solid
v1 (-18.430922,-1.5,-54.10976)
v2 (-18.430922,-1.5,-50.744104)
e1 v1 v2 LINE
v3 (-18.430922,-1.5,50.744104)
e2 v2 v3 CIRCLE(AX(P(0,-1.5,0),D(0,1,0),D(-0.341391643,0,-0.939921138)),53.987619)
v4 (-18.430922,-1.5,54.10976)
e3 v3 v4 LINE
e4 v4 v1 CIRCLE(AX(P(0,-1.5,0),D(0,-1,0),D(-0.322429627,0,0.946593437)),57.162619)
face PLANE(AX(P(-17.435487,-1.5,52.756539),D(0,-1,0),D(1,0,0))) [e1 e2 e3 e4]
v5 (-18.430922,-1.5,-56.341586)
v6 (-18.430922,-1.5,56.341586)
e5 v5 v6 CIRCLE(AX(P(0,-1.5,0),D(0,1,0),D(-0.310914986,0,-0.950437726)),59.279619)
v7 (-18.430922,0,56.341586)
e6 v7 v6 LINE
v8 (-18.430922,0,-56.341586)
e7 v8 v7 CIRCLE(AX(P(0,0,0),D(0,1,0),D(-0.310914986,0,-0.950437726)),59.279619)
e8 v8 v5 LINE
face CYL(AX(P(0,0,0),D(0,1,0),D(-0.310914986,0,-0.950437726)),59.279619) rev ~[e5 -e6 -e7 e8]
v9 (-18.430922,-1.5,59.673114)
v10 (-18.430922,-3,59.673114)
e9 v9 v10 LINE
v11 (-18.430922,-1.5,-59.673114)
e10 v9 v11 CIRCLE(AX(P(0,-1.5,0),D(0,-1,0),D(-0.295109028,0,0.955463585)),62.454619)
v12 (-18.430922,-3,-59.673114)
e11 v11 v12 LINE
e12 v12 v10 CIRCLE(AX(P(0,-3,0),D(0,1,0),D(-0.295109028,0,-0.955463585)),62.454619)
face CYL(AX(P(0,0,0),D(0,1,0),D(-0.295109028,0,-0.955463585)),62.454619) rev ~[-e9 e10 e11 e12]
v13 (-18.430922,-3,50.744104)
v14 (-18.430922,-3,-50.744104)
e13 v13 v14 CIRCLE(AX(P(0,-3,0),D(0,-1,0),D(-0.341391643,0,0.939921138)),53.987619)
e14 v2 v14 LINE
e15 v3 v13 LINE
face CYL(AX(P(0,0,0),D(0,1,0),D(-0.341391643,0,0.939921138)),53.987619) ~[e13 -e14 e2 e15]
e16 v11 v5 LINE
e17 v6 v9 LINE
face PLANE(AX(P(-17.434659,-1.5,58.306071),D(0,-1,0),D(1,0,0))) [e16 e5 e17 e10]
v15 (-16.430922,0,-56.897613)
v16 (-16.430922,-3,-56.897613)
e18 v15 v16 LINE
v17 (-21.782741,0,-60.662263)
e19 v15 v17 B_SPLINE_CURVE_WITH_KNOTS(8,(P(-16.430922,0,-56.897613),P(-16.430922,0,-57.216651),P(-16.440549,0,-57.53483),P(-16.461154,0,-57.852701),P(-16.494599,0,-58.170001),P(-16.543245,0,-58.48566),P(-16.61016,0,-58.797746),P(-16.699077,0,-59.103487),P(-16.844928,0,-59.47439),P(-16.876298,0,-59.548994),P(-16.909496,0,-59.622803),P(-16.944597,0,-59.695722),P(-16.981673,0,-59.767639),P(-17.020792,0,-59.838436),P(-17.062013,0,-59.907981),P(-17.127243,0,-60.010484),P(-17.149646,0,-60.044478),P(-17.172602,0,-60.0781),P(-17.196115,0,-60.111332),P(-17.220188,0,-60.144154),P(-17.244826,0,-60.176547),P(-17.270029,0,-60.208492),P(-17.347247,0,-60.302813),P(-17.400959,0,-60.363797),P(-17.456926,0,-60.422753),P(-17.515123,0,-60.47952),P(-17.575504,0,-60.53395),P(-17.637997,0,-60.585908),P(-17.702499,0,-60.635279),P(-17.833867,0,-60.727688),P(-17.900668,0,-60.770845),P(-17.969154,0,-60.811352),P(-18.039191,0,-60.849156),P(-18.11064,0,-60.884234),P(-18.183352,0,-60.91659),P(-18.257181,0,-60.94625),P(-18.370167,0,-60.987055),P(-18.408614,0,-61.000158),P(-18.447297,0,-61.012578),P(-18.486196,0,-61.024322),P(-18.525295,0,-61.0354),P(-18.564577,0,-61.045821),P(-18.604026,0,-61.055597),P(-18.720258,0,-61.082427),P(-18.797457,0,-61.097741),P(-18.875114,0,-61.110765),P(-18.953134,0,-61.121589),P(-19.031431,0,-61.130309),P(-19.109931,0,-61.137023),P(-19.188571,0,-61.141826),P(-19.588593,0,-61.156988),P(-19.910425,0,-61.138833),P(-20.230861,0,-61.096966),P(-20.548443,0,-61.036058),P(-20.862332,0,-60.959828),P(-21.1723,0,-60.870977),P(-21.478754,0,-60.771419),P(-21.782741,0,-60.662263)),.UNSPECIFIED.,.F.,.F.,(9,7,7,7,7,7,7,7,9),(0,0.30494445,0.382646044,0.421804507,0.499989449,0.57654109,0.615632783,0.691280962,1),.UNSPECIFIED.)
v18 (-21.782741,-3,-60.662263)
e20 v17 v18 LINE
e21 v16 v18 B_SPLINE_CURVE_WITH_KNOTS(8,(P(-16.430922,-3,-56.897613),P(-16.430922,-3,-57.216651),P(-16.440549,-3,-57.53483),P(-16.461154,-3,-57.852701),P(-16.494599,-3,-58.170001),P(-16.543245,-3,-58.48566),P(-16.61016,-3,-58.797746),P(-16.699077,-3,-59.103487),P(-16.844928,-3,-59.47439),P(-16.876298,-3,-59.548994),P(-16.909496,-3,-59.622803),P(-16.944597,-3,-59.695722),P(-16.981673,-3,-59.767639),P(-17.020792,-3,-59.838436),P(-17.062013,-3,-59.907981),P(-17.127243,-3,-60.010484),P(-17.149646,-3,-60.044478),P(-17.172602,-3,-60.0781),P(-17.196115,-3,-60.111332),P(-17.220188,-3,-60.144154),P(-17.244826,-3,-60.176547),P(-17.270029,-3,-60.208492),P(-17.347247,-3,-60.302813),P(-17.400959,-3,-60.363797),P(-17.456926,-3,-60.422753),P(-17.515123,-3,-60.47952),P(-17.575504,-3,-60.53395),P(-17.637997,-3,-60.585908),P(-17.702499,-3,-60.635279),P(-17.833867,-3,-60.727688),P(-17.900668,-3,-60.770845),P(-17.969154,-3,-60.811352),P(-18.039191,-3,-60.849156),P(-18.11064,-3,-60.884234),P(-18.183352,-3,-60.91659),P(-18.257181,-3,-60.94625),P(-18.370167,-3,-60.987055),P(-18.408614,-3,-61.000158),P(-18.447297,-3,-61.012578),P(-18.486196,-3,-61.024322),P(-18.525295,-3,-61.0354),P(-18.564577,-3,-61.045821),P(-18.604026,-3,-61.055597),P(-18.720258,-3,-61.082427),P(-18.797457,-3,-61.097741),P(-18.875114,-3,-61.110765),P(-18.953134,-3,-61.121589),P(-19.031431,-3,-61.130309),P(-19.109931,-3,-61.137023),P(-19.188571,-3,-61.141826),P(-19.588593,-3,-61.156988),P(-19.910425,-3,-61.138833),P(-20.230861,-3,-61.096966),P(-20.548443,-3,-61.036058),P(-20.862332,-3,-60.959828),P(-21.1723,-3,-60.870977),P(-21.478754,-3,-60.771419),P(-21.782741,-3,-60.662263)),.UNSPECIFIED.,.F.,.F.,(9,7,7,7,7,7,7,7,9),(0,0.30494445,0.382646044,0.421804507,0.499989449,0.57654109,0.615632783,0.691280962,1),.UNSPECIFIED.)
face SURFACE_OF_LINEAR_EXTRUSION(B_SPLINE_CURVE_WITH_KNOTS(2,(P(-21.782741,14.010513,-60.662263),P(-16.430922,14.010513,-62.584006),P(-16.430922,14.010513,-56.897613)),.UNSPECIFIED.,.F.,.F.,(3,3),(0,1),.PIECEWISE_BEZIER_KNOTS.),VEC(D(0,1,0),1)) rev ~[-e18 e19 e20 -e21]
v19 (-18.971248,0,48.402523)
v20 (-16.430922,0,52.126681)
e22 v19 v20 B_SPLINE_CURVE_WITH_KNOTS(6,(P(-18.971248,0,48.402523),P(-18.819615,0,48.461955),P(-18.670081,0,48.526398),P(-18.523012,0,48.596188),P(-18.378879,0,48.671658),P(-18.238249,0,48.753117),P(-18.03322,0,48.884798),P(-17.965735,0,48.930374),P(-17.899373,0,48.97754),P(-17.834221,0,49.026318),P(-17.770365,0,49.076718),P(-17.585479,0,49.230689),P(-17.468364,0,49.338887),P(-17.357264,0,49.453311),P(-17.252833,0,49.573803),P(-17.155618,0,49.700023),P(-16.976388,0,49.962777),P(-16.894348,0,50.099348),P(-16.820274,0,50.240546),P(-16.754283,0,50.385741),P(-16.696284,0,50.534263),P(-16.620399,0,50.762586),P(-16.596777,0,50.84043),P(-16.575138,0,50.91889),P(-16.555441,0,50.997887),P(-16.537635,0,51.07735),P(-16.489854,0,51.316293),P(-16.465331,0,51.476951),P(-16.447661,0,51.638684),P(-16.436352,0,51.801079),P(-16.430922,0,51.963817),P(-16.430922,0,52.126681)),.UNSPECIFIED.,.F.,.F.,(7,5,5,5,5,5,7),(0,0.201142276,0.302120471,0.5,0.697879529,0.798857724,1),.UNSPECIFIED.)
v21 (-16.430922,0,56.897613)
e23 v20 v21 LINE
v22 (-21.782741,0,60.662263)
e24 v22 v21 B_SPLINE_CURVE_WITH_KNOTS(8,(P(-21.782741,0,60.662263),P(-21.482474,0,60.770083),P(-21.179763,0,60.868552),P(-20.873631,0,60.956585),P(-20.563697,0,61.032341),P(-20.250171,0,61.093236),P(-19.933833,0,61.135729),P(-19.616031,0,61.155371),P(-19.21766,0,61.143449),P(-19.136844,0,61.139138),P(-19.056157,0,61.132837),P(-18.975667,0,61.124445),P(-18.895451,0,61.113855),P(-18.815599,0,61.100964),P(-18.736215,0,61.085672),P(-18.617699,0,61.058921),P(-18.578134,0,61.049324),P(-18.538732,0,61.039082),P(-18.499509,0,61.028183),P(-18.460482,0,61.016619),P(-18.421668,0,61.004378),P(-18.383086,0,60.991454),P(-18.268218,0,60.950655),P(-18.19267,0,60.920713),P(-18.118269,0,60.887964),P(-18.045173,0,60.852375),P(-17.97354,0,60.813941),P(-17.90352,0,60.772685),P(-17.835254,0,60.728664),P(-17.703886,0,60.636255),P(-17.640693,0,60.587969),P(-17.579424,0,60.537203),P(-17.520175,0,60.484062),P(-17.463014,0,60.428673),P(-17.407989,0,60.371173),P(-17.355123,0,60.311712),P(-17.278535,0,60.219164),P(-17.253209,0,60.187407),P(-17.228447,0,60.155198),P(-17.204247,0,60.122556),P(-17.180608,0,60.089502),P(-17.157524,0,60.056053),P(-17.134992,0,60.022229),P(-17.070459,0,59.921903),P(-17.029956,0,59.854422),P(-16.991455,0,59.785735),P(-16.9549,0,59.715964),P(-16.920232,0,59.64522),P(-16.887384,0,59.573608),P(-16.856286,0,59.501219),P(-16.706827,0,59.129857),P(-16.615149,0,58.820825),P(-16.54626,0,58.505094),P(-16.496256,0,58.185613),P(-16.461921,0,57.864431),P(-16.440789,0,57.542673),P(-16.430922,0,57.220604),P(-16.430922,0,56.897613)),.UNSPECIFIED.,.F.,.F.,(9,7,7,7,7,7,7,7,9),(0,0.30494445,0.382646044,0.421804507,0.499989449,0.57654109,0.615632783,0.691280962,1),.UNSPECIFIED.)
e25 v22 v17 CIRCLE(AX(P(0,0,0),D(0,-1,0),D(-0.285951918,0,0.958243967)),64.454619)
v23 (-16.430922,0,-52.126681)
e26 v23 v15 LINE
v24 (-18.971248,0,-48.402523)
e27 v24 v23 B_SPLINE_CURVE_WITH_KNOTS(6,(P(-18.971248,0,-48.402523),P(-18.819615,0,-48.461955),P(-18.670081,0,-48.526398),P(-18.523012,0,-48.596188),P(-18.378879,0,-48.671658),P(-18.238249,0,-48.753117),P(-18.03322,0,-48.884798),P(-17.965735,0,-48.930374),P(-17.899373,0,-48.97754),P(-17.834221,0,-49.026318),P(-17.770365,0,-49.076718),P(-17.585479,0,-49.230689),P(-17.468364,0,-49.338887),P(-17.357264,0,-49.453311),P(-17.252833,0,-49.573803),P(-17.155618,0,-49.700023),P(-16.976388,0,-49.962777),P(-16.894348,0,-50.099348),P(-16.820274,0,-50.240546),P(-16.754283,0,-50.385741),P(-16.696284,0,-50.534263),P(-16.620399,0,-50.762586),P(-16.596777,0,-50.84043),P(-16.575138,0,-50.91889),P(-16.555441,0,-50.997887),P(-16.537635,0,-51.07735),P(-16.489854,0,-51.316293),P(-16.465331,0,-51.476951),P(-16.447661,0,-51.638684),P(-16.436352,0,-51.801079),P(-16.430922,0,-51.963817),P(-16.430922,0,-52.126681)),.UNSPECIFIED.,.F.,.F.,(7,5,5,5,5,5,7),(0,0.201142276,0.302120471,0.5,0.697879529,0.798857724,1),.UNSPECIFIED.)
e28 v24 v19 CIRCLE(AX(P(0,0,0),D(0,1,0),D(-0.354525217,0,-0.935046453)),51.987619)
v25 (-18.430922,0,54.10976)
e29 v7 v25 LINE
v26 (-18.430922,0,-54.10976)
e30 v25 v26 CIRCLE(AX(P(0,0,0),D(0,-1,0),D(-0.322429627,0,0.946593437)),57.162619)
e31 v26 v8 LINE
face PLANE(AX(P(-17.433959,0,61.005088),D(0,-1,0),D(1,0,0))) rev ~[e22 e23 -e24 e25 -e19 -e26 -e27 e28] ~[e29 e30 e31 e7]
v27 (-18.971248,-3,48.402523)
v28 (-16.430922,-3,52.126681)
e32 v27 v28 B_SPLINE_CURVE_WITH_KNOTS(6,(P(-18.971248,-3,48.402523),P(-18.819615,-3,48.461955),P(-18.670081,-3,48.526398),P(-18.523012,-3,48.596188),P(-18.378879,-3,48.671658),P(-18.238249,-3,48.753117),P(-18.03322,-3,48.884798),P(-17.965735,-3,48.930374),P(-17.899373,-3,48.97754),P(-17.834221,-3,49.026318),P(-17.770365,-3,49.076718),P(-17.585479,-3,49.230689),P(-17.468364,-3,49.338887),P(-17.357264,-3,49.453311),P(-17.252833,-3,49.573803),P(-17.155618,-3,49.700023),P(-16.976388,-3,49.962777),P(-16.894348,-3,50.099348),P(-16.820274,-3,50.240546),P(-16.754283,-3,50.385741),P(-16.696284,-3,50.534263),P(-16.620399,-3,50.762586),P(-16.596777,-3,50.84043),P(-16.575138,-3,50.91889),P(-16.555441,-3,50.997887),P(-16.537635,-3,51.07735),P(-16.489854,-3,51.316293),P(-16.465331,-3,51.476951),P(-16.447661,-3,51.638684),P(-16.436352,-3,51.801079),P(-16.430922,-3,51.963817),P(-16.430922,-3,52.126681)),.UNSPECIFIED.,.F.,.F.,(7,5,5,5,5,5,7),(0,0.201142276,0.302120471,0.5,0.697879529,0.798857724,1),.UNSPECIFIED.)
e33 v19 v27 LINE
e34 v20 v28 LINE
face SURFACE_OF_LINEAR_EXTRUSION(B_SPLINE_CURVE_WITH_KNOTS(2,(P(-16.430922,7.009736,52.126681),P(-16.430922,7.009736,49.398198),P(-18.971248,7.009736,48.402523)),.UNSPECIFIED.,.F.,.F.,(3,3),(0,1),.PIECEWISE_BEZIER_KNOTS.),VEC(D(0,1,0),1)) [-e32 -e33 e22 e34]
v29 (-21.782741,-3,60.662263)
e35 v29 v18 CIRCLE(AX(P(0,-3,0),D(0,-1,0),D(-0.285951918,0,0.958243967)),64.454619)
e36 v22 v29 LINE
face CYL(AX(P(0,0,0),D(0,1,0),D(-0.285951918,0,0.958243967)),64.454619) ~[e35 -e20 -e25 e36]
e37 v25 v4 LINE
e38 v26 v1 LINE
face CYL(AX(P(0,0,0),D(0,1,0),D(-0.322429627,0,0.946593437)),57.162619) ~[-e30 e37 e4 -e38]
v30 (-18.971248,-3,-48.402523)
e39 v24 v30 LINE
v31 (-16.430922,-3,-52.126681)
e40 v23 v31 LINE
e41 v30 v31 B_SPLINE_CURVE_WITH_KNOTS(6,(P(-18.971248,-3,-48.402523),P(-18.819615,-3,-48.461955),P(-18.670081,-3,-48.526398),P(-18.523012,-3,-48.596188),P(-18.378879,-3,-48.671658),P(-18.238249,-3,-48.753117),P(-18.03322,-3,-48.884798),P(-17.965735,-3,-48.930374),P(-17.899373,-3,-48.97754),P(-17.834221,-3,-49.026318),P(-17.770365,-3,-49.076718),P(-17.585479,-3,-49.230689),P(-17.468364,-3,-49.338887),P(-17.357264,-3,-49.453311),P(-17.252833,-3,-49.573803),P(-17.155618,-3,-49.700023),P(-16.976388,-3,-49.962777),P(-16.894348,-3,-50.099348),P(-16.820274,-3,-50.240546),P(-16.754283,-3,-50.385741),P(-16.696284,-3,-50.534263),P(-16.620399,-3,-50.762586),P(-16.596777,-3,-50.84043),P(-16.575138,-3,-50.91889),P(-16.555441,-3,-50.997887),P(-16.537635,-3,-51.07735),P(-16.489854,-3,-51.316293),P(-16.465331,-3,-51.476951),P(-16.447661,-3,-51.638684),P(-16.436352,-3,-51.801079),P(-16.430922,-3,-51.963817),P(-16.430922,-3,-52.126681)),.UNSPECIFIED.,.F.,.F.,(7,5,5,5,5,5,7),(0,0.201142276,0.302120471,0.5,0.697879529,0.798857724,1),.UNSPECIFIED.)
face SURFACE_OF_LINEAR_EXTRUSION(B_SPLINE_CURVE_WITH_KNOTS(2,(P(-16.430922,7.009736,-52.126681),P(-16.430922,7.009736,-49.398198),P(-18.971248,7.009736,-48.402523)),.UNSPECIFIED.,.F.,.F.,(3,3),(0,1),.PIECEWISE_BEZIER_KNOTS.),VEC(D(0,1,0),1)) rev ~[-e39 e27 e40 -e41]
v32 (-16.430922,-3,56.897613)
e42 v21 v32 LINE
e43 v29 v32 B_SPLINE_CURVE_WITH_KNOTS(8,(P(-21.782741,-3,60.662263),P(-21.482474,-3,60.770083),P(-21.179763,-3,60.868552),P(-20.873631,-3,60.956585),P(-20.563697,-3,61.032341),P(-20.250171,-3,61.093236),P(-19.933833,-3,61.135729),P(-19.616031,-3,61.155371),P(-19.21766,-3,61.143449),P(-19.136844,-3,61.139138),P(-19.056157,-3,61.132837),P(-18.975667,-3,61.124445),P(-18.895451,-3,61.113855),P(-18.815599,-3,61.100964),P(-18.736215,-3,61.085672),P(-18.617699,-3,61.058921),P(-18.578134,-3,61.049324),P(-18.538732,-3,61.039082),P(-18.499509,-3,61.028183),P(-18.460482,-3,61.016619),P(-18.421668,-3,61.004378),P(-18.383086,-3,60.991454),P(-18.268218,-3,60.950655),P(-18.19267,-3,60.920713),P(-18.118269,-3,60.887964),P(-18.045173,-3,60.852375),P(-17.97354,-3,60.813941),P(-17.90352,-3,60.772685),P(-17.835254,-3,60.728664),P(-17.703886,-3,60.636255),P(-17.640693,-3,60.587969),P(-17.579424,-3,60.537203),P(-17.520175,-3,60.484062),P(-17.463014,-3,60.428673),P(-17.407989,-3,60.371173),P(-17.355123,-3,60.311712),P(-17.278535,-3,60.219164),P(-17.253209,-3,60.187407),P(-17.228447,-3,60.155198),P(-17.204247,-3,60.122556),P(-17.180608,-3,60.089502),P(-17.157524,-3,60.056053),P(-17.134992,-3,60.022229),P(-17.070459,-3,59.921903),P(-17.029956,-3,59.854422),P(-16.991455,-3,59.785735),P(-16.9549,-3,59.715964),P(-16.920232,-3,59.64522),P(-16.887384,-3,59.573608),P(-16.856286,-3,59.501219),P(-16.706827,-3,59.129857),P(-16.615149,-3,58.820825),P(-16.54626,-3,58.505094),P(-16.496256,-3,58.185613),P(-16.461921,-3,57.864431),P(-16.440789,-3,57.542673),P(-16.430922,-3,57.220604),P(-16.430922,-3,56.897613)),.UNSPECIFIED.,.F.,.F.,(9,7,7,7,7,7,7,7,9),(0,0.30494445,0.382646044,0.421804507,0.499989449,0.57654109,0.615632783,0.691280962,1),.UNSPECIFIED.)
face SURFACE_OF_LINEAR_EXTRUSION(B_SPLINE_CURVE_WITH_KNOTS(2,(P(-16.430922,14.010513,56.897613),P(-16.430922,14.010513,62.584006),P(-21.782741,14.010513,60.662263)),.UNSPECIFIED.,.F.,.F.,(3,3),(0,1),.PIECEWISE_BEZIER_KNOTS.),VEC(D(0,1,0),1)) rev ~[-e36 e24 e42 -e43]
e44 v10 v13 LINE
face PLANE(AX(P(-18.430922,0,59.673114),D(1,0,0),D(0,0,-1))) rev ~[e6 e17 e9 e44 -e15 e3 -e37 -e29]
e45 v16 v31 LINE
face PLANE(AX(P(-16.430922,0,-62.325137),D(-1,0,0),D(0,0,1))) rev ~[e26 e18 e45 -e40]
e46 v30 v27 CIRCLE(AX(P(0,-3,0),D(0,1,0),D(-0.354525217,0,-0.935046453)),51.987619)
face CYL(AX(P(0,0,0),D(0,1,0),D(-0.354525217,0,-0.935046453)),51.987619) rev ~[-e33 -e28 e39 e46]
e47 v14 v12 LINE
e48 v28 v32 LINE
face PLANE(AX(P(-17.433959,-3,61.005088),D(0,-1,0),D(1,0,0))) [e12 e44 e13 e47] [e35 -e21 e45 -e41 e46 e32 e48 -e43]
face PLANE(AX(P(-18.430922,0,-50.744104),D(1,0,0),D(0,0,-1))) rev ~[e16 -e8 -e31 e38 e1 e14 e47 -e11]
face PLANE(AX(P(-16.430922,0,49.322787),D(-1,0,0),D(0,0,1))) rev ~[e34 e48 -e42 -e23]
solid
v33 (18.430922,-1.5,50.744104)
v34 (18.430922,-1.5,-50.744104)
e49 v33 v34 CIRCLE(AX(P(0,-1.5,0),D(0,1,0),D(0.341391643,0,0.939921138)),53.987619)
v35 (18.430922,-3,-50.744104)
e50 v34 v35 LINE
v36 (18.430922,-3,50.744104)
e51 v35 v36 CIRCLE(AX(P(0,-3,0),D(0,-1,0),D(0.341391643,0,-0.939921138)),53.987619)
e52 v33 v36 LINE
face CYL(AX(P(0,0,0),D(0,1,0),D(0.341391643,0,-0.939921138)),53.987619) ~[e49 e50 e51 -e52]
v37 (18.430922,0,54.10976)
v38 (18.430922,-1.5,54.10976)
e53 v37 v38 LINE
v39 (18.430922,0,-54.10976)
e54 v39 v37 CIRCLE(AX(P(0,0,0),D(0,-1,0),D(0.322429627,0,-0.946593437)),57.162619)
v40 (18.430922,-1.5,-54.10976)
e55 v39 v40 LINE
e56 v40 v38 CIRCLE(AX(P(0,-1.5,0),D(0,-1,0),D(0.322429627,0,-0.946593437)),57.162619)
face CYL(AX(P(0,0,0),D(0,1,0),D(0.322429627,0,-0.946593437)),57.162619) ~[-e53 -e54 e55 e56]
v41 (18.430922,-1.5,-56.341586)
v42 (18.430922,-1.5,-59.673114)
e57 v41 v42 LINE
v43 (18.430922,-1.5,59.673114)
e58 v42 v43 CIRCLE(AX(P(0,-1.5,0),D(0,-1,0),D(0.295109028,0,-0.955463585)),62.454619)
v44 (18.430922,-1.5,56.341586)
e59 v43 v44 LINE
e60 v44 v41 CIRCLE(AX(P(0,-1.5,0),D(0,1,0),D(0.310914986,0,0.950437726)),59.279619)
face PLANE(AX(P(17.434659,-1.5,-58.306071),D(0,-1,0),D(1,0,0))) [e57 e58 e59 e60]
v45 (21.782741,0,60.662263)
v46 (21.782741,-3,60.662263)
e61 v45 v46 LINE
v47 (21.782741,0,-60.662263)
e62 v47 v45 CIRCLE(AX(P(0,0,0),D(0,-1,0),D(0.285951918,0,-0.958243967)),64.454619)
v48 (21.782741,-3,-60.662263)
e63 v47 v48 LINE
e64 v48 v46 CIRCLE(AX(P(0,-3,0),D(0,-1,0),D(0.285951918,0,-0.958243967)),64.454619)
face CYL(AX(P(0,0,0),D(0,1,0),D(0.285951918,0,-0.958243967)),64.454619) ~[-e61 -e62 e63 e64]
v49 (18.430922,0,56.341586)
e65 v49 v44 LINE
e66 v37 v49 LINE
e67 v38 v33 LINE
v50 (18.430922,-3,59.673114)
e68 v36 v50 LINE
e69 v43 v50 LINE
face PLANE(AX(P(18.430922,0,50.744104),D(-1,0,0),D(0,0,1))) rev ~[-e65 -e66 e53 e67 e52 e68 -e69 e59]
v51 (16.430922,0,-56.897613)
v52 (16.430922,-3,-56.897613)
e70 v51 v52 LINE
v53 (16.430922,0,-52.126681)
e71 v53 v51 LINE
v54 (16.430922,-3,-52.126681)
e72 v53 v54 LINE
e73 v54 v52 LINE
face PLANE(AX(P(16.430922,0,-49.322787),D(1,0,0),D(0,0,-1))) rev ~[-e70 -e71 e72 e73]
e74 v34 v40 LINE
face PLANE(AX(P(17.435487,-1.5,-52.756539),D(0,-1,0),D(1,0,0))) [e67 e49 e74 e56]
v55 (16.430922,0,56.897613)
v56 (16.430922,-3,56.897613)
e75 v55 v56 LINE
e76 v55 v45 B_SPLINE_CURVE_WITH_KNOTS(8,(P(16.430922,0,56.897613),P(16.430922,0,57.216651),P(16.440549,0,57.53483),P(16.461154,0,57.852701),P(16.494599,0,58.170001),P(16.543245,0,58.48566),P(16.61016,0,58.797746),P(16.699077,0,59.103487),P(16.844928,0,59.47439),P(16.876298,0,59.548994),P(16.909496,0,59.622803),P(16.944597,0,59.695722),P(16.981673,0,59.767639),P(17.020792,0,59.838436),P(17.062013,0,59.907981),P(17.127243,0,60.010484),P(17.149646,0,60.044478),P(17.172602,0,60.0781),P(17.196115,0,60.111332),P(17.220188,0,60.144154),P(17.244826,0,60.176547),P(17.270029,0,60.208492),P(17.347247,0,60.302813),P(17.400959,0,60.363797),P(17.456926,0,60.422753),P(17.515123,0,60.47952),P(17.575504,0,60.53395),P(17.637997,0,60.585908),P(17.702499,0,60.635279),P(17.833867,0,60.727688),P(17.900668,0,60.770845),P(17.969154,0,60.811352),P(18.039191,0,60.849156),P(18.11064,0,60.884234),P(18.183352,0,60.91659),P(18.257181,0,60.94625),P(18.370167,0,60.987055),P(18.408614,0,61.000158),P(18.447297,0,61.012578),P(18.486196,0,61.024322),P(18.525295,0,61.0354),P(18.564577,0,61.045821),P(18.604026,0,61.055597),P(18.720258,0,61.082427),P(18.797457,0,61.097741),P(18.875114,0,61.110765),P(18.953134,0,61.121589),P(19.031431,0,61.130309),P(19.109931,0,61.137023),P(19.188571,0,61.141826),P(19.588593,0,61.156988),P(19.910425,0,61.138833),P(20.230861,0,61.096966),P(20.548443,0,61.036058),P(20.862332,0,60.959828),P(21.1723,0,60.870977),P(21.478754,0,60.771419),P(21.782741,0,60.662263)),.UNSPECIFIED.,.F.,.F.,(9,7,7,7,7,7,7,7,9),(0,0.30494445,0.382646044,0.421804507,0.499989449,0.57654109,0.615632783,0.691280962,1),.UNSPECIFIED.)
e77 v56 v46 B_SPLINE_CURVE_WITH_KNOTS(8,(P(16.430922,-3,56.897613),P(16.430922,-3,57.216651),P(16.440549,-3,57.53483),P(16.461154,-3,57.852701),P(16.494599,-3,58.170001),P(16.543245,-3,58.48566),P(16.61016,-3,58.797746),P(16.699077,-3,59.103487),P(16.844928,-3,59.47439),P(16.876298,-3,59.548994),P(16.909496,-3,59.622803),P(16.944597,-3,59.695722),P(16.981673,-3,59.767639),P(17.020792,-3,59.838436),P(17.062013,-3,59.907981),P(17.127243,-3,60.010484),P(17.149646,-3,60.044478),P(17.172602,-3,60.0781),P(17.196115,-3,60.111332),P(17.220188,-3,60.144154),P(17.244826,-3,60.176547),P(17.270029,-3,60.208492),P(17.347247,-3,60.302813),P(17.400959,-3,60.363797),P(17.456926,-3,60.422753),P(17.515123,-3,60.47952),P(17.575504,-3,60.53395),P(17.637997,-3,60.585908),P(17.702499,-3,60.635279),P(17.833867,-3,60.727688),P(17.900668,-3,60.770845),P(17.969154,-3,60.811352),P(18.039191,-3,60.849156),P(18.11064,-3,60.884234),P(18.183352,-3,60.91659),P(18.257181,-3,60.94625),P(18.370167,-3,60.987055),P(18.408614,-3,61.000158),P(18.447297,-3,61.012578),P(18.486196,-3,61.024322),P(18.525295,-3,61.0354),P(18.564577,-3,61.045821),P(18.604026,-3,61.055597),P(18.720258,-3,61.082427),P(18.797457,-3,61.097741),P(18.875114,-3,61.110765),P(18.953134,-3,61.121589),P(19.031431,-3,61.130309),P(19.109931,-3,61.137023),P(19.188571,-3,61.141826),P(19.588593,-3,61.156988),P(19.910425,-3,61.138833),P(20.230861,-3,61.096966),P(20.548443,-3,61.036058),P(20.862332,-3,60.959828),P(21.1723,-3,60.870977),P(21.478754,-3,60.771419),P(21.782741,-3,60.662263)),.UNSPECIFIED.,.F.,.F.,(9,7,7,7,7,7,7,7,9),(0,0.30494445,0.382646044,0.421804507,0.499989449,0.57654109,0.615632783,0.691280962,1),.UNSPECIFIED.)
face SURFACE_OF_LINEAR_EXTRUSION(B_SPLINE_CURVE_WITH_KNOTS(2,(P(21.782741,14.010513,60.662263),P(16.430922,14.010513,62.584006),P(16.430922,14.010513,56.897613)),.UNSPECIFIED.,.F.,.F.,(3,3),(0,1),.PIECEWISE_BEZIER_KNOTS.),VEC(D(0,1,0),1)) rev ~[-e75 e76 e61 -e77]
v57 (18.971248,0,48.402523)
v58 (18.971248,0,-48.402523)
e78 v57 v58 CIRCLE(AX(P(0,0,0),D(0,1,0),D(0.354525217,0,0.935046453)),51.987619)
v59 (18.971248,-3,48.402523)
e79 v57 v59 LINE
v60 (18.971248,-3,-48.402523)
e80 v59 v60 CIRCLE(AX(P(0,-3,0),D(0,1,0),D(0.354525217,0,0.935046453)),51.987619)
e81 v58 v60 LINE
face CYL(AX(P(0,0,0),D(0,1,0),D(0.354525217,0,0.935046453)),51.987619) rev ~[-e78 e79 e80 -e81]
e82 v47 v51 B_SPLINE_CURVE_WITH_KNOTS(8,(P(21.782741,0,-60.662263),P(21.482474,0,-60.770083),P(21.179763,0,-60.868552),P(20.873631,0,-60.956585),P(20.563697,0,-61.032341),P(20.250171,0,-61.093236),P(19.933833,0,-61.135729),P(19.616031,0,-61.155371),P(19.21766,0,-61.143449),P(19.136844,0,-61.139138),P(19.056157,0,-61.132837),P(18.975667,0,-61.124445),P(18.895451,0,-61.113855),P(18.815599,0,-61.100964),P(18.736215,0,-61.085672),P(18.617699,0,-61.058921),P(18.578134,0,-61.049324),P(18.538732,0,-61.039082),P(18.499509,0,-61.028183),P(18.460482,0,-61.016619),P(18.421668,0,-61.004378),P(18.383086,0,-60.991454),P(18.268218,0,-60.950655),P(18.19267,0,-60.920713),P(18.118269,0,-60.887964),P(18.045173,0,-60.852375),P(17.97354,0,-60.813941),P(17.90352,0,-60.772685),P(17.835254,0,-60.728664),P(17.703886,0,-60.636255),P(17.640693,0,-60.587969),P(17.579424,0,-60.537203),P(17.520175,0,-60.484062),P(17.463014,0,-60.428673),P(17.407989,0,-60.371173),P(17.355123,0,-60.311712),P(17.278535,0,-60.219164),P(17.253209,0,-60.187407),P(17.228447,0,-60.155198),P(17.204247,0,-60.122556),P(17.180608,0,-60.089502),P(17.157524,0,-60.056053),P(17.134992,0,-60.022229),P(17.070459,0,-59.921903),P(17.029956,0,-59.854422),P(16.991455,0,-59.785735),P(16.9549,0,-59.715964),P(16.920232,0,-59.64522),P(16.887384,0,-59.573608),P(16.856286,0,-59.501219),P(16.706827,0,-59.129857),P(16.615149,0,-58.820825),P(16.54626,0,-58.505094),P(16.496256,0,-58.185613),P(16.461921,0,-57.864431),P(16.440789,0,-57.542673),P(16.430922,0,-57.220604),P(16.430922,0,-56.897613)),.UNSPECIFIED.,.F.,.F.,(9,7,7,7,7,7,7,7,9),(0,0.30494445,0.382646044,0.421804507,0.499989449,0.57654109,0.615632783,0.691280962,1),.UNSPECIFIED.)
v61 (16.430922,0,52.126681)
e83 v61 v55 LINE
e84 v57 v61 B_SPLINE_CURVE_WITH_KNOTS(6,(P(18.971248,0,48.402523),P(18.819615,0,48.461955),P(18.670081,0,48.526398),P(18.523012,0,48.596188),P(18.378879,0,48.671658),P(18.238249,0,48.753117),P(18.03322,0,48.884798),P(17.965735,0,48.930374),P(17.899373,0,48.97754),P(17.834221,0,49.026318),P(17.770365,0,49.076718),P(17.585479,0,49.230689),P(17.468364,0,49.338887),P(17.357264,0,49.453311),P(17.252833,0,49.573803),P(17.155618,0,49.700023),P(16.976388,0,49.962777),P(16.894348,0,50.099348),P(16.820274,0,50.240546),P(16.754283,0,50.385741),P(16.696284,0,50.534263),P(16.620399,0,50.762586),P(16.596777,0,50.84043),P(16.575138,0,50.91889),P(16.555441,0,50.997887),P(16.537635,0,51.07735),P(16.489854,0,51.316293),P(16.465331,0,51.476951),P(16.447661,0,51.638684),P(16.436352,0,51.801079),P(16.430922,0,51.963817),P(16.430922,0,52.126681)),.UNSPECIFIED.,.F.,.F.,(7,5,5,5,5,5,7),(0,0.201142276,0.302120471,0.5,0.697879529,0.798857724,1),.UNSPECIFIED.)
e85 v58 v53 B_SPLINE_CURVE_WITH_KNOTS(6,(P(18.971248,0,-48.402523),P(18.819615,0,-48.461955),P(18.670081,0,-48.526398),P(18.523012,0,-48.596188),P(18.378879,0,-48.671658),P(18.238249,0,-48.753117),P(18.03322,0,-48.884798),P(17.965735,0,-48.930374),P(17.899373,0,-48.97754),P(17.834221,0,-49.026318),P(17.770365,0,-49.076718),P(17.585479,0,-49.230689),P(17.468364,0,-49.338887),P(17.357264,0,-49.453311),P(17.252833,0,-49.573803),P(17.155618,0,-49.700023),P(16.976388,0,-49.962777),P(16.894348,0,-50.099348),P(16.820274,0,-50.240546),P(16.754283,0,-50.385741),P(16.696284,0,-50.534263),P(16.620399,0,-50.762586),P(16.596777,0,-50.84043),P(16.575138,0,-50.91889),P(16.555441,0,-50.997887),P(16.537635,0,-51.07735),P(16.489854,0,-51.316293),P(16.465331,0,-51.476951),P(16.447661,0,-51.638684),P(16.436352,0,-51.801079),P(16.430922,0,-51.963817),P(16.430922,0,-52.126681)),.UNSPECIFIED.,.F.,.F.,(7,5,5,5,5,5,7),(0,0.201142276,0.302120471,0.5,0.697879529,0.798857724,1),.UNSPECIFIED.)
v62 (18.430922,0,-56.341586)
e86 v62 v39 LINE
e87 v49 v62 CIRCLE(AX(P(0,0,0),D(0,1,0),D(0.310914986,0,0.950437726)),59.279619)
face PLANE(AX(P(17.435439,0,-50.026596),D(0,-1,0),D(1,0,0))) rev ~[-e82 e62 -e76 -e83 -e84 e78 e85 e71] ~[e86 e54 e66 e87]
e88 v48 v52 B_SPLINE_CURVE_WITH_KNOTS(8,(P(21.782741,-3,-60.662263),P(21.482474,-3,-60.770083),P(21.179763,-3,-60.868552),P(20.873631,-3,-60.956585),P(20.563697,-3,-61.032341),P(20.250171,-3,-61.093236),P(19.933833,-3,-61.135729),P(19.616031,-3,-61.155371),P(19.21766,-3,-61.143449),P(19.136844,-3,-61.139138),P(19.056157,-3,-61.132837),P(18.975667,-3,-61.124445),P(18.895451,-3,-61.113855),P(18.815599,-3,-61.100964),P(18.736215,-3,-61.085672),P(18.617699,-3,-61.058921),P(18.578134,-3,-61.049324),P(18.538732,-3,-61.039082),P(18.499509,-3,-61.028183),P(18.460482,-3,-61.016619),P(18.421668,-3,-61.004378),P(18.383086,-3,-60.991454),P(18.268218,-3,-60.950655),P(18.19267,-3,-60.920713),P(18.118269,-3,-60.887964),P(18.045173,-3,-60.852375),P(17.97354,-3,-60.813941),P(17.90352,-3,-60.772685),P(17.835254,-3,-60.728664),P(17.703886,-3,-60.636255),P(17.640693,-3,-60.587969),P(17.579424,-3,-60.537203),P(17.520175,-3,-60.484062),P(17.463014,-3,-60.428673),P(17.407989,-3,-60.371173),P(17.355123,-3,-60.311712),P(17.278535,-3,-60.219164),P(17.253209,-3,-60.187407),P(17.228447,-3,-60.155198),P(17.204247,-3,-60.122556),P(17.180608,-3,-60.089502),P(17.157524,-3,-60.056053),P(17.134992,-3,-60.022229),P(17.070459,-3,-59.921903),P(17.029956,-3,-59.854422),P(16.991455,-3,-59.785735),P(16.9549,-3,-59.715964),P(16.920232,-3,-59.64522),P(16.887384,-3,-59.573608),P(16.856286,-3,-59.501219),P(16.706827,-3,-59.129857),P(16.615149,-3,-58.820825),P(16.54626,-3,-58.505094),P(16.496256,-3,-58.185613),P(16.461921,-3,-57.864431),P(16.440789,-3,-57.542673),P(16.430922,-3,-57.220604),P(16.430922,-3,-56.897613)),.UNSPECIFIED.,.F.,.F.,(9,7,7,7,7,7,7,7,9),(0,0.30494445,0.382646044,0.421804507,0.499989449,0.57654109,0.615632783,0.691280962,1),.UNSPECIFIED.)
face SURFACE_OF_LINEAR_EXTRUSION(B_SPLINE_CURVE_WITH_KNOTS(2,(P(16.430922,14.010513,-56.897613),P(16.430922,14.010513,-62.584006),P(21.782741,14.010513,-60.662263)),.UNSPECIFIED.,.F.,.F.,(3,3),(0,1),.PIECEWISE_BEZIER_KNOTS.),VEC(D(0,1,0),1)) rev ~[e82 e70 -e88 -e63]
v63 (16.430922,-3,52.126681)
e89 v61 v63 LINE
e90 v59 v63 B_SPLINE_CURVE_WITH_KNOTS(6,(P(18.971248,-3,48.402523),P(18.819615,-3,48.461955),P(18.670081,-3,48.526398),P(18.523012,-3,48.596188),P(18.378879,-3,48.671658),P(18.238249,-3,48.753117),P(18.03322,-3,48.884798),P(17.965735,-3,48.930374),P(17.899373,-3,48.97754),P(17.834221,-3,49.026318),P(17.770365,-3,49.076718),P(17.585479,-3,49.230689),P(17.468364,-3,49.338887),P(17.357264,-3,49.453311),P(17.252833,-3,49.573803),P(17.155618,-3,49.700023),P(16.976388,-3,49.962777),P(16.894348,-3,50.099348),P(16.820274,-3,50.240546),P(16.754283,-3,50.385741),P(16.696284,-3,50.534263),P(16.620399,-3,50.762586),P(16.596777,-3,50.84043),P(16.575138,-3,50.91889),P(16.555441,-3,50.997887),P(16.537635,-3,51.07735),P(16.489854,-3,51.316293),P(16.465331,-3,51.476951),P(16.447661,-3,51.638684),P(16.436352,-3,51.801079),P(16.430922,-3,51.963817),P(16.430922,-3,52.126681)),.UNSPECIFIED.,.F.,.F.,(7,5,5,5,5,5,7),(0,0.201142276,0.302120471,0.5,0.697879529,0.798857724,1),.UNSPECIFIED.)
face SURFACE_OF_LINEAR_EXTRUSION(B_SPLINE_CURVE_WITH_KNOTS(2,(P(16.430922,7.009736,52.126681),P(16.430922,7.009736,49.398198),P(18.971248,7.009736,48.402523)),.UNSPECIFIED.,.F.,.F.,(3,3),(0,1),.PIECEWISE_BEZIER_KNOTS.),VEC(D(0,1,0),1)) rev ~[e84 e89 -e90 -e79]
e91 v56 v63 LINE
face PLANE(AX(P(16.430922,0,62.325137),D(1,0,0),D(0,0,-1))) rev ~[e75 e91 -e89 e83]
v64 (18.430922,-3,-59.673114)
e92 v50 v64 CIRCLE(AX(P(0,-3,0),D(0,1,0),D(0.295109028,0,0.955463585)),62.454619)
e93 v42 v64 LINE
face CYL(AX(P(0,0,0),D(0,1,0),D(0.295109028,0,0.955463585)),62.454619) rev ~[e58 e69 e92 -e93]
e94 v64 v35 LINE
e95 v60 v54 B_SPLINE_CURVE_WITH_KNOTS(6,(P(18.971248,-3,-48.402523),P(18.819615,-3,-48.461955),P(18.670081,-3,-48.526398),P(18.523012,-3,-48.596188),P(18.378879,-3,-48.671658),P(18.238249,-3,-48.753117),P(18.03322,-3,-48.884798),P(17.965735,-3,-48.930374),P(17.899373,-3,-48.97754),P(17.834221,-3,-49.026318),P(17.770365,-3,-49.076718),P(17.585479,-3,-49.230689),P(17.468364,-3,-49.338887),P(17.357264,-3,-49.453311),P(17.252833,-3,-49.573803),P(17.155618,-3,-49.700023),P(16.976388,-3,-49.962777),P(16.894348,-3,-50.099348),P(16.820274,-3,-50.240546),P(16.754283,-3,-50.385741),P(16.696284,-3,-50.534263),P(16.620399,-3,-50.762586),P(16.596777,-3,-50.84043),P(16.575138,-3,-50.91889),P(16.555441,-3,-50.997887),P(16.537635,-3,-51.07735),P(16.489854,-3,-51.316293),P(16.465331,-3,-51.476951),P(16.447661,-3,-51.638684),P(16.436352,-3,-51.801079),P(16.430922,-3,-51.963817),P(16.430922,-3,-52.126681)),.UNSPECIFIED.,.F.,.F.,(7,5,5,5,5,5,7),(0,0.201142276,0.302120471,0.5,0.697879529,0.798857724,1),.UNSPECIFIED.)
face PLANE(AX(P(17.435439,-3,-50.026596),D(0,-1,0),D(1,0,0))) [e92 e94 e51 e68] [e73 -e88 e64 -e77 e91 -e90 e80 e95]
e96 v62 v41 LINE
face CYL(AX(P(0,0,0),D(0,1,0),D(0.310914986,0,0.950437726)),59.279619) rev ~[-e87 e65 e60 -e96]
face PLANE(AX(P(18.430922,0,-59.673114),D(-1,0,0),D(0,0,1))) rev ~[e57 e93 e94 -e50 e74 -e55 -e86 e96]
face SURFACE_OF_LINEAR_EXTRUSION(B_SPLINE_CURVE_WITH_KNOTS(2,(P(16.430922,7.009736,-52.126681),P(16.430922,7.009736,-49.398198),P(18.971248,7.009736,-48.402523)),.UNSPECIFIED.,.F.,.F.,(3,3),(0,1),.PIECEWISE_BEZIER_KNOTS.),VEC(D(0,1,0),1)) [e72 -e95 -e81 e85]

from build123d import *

# Parameters (mm, degrees)
F1_DEPTH      = 1.5
F2_DEPTH      = 3
F3_T1_DEPTH   = 31.0210256648
F3_T3_DEPTH   = 17.0194710076
F3_2_T1_DEPTH = 31.0210256648
F3_2_T3_DEPTH = 17.0194710075


# Not quite as in the source:
# - a fillet or chamfer that OpenCascade refuses, or shapes differently, is made with other operations: its cross-section is extruded or revolved along the edge and cut away or added


with BuildPart() as f1:
    # F0 (on Front) → F1 (new body)
    with BuildSketch(Plane.XZ):
        with BuildLine():
            ThreePointArc((-18.4309218526, 56.3415860789), (-17.4336374643, 56.6581105137), (-16.4309218526, 56.95698385))
            Line((-16.4309218526, 56.95698385), (-16.4309218526, 60.2544953802))
            ThreePointArc((-16.4309218526, 60.2544953802), (-17.433345569, 59.972142439), (-18.4309218526, 59.6731139301))
            Line((-18.4309218526, 59.6731139301), (-18.4309218526, 56.3415860789))
        make_face()
        with BuildLine():
            ThreePointArc((-18.4309218526, -56.3415860789), (-59.2796187759, 0), (-18.4309218526, 56.3415860789))
            Line((-18.4309218526, 56.3415860789), (-18.4309218526, 59.6731139301))
            ThreePointArc((-18.4309218526, 59.6731139301), (-62.4546187759, 0), (-18.4309218526, -59.6731139301))
            Line((-18.4309218526, -59.6731139301), (-18.4309218526, -56.3415860789))
        make_face()
        with BuildLine():
            ThreePointArc((-16.4309218526, -56.95698385), (-17.4336374643, -56.6581105137), (-18.4309218526, -56.3415860789))
            Line((-18.4309218526, -56.3415860789), (-18.4309218526, -59.6731139301))
            ThreePointArc((-18.4309218526, -59.6731139301), (-17.433345569, -59.972142439), (-16.4309218526, -60.2544953802))
            Line((-16.4309218526, -60.2544953802), (-16.4309218526, -56.95698385))
        make_face()
    extrude(amount=F1_DEPTH)



with BuildPart() as f1b:
    # F0 (on Front) → F1, piece 2 (new body)
    with BuildSketch(Plane.XZ):
        with BuildLine():
            ThreePointArc((-18.4309218526, 50.7441040985), (-17.4342611615, 51.0951026895), (-16.4309218526, 51.4265280587))
            Line((-16.4309218526, 51.4265280587), (-16.4309218526, 54.7502492451))
            ThreePointArc((-16.4309218526, 54.7502492451), (-17.4338634076, 54.4391898544), (-18.4309218526, 54.1097597942))
            Line((-18.4309218526, 54.1097597942), (-18.4309218526, 50.7441040985))
        make_face()
        with BuildLine():
            ThreePointArc((-18.4309218526, -50.7441040985), (-53.9876187759, 0), (-18.4309218526, 50.7441040985))
            Line((-18.4309218526, 50.7441040985), (-18.4309218526, 54.1097597942))
            ThreePointArc((-18.4309218526, 54.1097597942), (-57.1626187759, 0), (-18.4309218526, -54.1097597942))
            Line((-18.4309218526, -54.1097597942), (-18.4309218526, -50.7441040985))
        make_face()
        with BuildLine():
            ThreePointArc((-16.4309218526, -51.4265280587), (-17.4342611615, -51.0951026895), (-18.4309218526, -50.7441040985))
            Line((-18.4309218526, -50.7441040985), (-18.4309218526, -54.1097597942))
            ThreePointArc((-18.4309218526, -54.1097597942), (-17.4338634076, -54.4391898544), (-16.4309218526, -54.7502492451))
            Line((-16.4309218526, -54.7502492451), (-16.4309218526, -51.4265280587))
        make_face()
    extrude(amount=F1_DEPTH)


with BuildPart() as f1c:
    # F0 (on Front) → F1, piece 3 (new body)
    with BuildSketch(Plane.XZ):
        with BuildLine():
            ThreePointArc((18.4309218526, -56.3415860789), (17.4336374643, -56.6581105137), (16.4309218526, -56.95698385))
            Line((16.4309218526, -56.95698385), (16.4309218526, -60.2544953802))
            ThreePointArc((16.4309218526, -60.2544953802), (17.433345569, -59.972142439), (18.4309218526, -59.6731139301))
            Line((18.4309218526, -59.6731139301), (18.4309218526, -56.3415860789))
        make_face()
        with BuildLine():
            ThreePointArc((18.4309218526, 56.3415860789), (59.2796187759, 0), (18.4309218526, -56.3415860789))
            Line((18.4309218526, -56.3415860789), (18.4309218526, -59.6731139301))
            ThreePointArc((18.4309218526, -59.6731139301), (62.4546187759, 0), (18.4309218526, 59.6731139301))
            Line((18.4309218526, 59.6731139301), (18.4309218526, 56.3415860789))
        make_face()
        with BuildLine():
            ThreePointArc((16.4309218526, 56.95698385), (17.4336374643, 56.6581105137), (18.4309218526, 56.3415860789))
            Line((18.4309218526, 56.3415860789), (18.4309218526, 59.6731139301))
            ThreePointArc((18.4309218526, 59.6731139301), (17.433345569, 59.972142439), (16.4309218526, 60.2544953802))
            Line((16.4309218526, 60.2544953802), (16.4309218526, 56.95698385))
        make_face()
    extrude(amount=F1_DEPTH)



with BuildPart() as f1d:
    # F0 (on Front) → F1, piece 4 (new body)
    with BuildSketch(Plane.XZ):
        with BuildLine():
            ThreePointArc((18.4309218526, -50.7441040985), (17.4342611615, -51.0951026895), (16.4309218526, -51.4265280587))
            Line((16.4309218526, -51.4265280587), (16.4309218526, -54.7502492451))
            ThreePointArc((16.4309218526, -54.7502492451), (17.4338634076, -54.4391898544), (18.4309218526, -54.1097597942))
            Line((18.4309218526, -54.1097597942), (18.4309218526, -50.7441040985))
        make_face()
        with BuildLine():
            ThreePointArc((18.4309218526, 50.7441040985), (53.9876187759, 0), (18.4309218526, -50.7441040985))
            Line((18.4309218526, -50.7441040985), (18.4309218526, -54.1097597942))
            ThreePointArc((18.4309218526, -54.1097597942), (57.1626187759, 0), (18.4309218526, 54.1097597942))
            Line((18.4309218526, 54.1097597942), (18.4309218526, 50.7441040985))
        make_face()
        with BuildLine():
            ThreePointArc((16.4309218526, 51.4265280587), (17.4342611615, 51.0951026895), (18.4309218526, 50.7441040985))
            Line((18.4309218526, 50.7441040985), (18.4309218526, 54.1097597942))
            ThreePointArc((18.4309218526, 54.1097597942), (17.4338634076, 54.4391898544), (16.4309218526, 54.7502492451))
            Line((16.4309218526, 54.7502492451), (16.4309218526, 51.4265280587))
        make_face()
    extrude(amount=F1_DEPTH)


with BuildPart() as f1_1:
    add(f1.part)

    add(f1b.part)  # F2 merges F1b
    # F0 (on Front) → F2 (join)
    with BuildSketch(Plane.XZ):
        with BuildLine():
            ThreePointArc((-18.4309218526, 59.6731139301), (-17.433345569, 59.972142439), (-16.4309218526, 60.2544953802))
            Line((-16.4309218526, 60.2544953802), (-16.4309218526, 62.3251368921))
            ThreePointArc((-16.4309218526, 62.3251368921), (-17.4331857663, 62.0522514949), (-18.4309218526, 61.7632496005))
            Line((-18.4309218526, 61.7632496005), (-18.4309218526, 59.6731139301))
        make_face()
        with BuildLine():
            ThreePointArc((-18.4309218526, -59.6731139301), (-62.4546187759, 0), (-18.4309218526, 59.6731139301))
            Line((-18.4309218526, 59.6731139301), (-18.4309218526, 61.7632496005))
            ThreePointArc((-18.4309218526, 61.7632496005), (-64.4546187759, 0), (-18.4309218526, -61.7632496005))
            Line((-18.4309218526, -61.7632496005), (-18.4309218526, -59.6731139301))
        make_face()
        with BuildLine():
            ThreePointArc((-16.4309218526, -60.2544953802), (-17.433345569, -59.972142439), (-18.4309218526, -59.6731139301))
            Line((-18.4309218526, -59.6731139301), (-18.4309218526, -61.7632496005))
            ThreePointArc((-18.4309218526, -61.7632496005), (-17.4331857663, -62.0522514949), (-16.4309218526, -62.3251368921))
            Line((-16.4309218526, -62.3251368921), (-16.4309218526, -60.2544953802))
        make_face()
        with BuildLine():
            Line((-16.4309218526, 49.3227869556), (-16.4309218526, 51.4265280587))
            ThreePointArc((-16.4309218526, 51.4265280587), (-17.4342611615, 51.0951026895), (-18.4309218526, 50.7441040985))
            Line((-18.4309218526, 50.7441040985), (-18.4309218526, 48.6108385615))
            ThreePointArc((-18.4309218526, 48.6108385615), (-17.4345563253, 48.9770226916), (-16.4309218526, 49.3227869556))
        make_face()
        with BuildLine():
            Line((-18.4309218526, 48.6108385615), (-18.4309218526, 50.7441040985))
            ThreePointArc((-18.4309218526, 50.7441040985), (-53.9876187759, 0), (-18.4309218526, -50.7441040985))
            Line((-18.4309218526, -50.7441040985), (-18.4309218526, -48.6108385615))
            ThreePointArc((-18.4309218526, -48.6108385615), (-51.9876187759, 0), (-18.4309218526, 48.6108385615))
        make_face()
        with BuildLine():
            Line((-18.4309218526, -48.6108385615), (-18.4309218526, -50.7441040985))
            ThreePointArc((-18.4309218526, -50.7441040985), (-17.4342611615, -51.0951026895), (-16.4309218526, -51.4265280587))
            Line((-16.4309218526, -51.4265280587), (-16.4309218526, -49.3227869556))
            ThreePointArc((-16.4309218526, -49.3227869556), (-17.4345563253, -48.9770226916), (-18.4309218526, -48.6108385615))
        make_face()
        with BuildLine():
            ThreePointArc((-18.4309218526, 54.1097597942), (-17.4338634076, 54.4391898544), (-16.4309218526, 54.7502492451))
            Line((-16.4309218526, 54.7502492451), (-16.4309218526, 56.95698385))
            ThreePointArc((-16.4309218526, 56.95698385), (-17.4336374643, 56.6581105137), (-18.4309218526, 56.3415860789))
            Line((-18.4309218526, 56.3415860789), (-18.4309218526, 54.1097597942))
        make_face()
        with BuildLine():
            ThreePointArc((-18.4309218526, 50.7441040985), (-17.4342611615, 51.0951026895), (-16.4309218526, 51.4265280587))
            Line((-16.4309218526, 51.4265280587), (-16.4309218526, 54.7502492451))
            ThreePointArc((-16.4309218526, 54.7502492451), (-17.4338634076, 54.4391898544), (-18.4309218526, 54.1097597942))
            Line((-18.4309218526, 54.1097597942), (-18.4309218526, 50.7441040985))
        make_face()
        with BuildLine():
            ThreePointArc((-18.4309218526, 56.3415860789), (-17.4336374643, 56.6581105137), (-16.4309218526, 56.95698385))
            Line((-16.4309218526, 56.95698385), (-16.4309218526, 60.2544953802))
            ThreePointArc((-16.4309218526, 60.2544953802), (-17.433345569, 59.972142439), (-18.4309218526, 59.6731139301))
            Line((-18.4309218526, 59.6731139301), (-18.4309218526, 56.3415860789))
        make_face()
        with BuildLine():
            ThreePointArc((-16.4309218526, -51.4265280587), (-17.4342611615, -51.0951026895), (-18.4309218526, -50.7441040985))
            Line((-18.4309218526, -50.7441040985), (-18.4309218526, -54.1097597942))
            ThreePointArc((-18.4309218526, -54.1097597942), (-17.4338634076, -54.4391898544), (-16.4309218526, -54.7502492451))
            Line((-16.4309218526, -54.7502492451), (-16.4309218526, -51.4265280587))
        make_face()
        with BuildLine():
            ThreePointArc((-16.4309218526, -54.7502492451), (-17.4338634076, -54.4391898544), (-18.4309218526, -54.1097597942))
            Line((-18.4309218526, -54.1097597942), (-18.4309218526, -56.3415860789))
            ThreePointArc((-18.4309218526, -56.3415860789), (-17.4336374643, -56.6581105137), (-16.4309218526, -56.95698385))
            Line((-16.4309218526, -56.95698385), (-16.4309218526, -54.7502492451))
        make_face()
        with BuildLine():
            ThreePointArc((-16.4309218526, -56.95698385), (-17.4336374643, -56.6581105137), (-18.4309218526, -56.3415860789))
            Line((-18.4309218526, -56.3415860789), (-18.4309218526, -59.6731139301))
            ThreePointArc((-18.4309218526, -59.6731139301), (-17.433345569, -59.972142439), (-16.4309218526, -60.2544953802))
            Line((-16.4309218526, -60.2544953802), (-16.4309218526, -56.95698385))
        make_face()
    extrude(amount=F2_DEPTH)

    # F3#2: fillet of radius 4 on 4 edges, made by hand

    # F3_2_s2 → F3_2_t1 (cut)
    with BuildSketch(Plane.XZ.offset(-14.0105128324)):
        with BuildLine():
            add(Edge.make_bspline(
                [(-21.7827406063, -60.6622625133), (-16.4309218526, -62.5840055353), (-16.4309218526, -56.8976129869)],
                knots=[0, 0, 0, 1, 1, 1], degree=2, weights=[1, 1, 1]))
            Line((-16.4309218526, -56.8976129869), (-16.4309218526, -62.3251368921))
            ThreePointArc((-16.4309218526, -62.3251368921), (-19.1249127431, -61.5518935056), (-21.7827406063, -60.6622625133))
        make_face()
        with BuildLine():
            add(Edge.make_bspline(
                [(-16.4309218526, 56.8976129868), (-16.4309218526, 62.5840055353), (-21.7827406063, 60.6622625133)],
                knots=[0, 0, 0, 1, 1, 1], degree=2, weights=[1, 1, 1]))
            ThreePointArc((-21.7827406063, 60.6622625133), (-19.1249127431, 61.5518935056), (-16.4309218526, 62.3251368921))
            Line((-16.4309218526, 62.3251368921), (-16.4309218526, 56.8976129868))
        make_face()
    extrude(amount=F3_2_T1_DEPTH, mode=Mode.SUBTRACT)

    # F3_2_s4 → F3_2_t3 (cut)
    with BuildSketch(Plane.XZ.offset(-7.0097355038)):
        with BuildLine():
            add(Edge.make_bspline(
                [(-16.4309218526, -52.1266811571), (-16.4309218526, -49.3981976907), (-18.9712475675, -48.4025234024)],
                knots=[0, 0, 0, 1, 1, 1], degree=2, weights=[1, 1, 1]))
            ThreePointArc((-18.9712475675, -48.4025234024), (-17.7070641599, -48.8791610487), (-16.4309218526, -49.3227869556))
            Line((-16.4309218526, -49.3227869556), (-16.4309218526, -52.1266811571))
        make_face()
        with BuildLine():
            add(Edge.make_bspline(
                [(-16.4309218526, 52.1266811571), (-16.4309218526, 49.3981976907), (-18.9712475675, 48.4025234025)],
                knots=[0, 0, 0, 1, 1, 1], degree=2, weights=[1, 1, 1]))
            ThreePointArc((-18.9712475675, 48.4025234025), (-17.7070641599, 48.8791610487), (-16.4309218526, 49.3227869556))
            Line((-16.4309218526, 49.3227869556), (-16.4309218526, 52.1266811571))
        make_face()
    extrude(amount=F3_2_T3_DEPTH, mode=Mode.SUBTRACT)


with BuildPart() as f1c_1:
    add(f1c.part)

    add(f1d.part)  # F2#2 merges F1d
    # F0 (on Front) → F2, piece 2 (join)
    with BuildSketch(Plane.XZ):
        with BuildLine():
            Line((16.4309218526, -49.3227869556), (16.4309218526, -51.4265280587))
            ThreePointArc((16.4309218526, -51.4265280587), (17.4342611615, -51.0951026895), (18.4309218526, -50.7441040985))
            Line((18.4309218526, -50.7441040985), (18.4309218526, -48.6108385615))
            ThreePointArc((18.4309218526, -48.6108385615), (17.4345563253, -48.9770226916), (16.4309218526, -49.3227869556))
        make_face()
        with BuildLine():
            Line((18.4309218526, -48.6108385615), (18.4309218526, -50.7441040985))
            ThreePointArc((18.4309218526, -50.7441040985), (53.9876187759, 0), (18.4309218526, 50.7441040985))
            Line((18.4309218526, 50.7441040985), (18.4309218526, 48.6108385615))
            ThreePointArc((18.4309218526, 48.6108385615), (51.9876187759, 0), (18.4309218526, -48.6108385615))
        make_face()
        with BuildLine():
            Line((18.4309218526, 48.6108385615), (18.4309218526, 50.7441040985))
            ThreePointArc((18.4309218526, 50.7441040985), (17.4342611615, 51.0951026895), (16.4309218526, 51.4265280587))
            Line((16.4309218526, 51.4265280587), (16.4309218526, 49.3227869556))
            ThreePointArc((16.4309218526, 49.3227869556), (17.4345563253, 48.9770226916), (18.4309218526, 48.6108385615))
        make_face()
        with BuildLine():
            ThreePointArc((18.4309218526, -59.6731139301), (17.433345569, -59.972142439), (16.4309218526, -60.2544953802))
            Line((16.4309218526, -60.2544953802), (16.4309218526, -62.3251368921))
            ThreePointArc((16.4309218526, -62.3251368921), (17.4331857663, -62.0522514949), (18.4309218526, -61.7632496005))
            Line((18.4309218526, -61.7632496005), (18.4309218526, -59.6731139301))
        make_face()
        with BuildLine():
            ThreePointArc((18.4309218526, 59.6731139301), (62.4546187759, 0), (18.4309218526, -59.6731139301))
            Line((18.4309218526, -59.6731139301), (18.4309218526, -61.7632496005))
            ThreePointArc((18.4309218526, -61.7632496005), (64.4546187759, 0), (18.4309218526, 61.7632496005))
            Line((18.4309218526, 61.7632496005), (18.4309218526, 59.6731139301))
        make_face()
        with BuildLine():
            ThreePointArc((16.4309218526, 60.2544953802), (17.433345569, 59.972142439), (18.4309218526, 59.6731139301))
            Line((18.4309218526, 59.6731139301), (18.4309218526, 61.7632496005))
            ThreePointArc((18.4309218526, 61.7632496005), (17.4331857663, 62.0522514949), (16.4309218526, 62.3251368921))
            Line((16.4309218526, 62.3251368921), (16.4309218526, 60.2544953802))
        make_face()
        with BuildLine():
            ThreePointArc((16.4309218526, 54.7502492451), (17.4338634076, 54.4391898544), (18.4309218526, 54.1097597942))
            Line((18.4309218526, 54.1097597942), (18.4309218526, 56.3415860789))
            ThreePointArc((18.4309218526, 56.3415860789), (17.4336374643, 56.6581105137), (16.4309218526, 56.95698385))
            Line((16.4309218526, 56.95698385), (16.4309218526, 54.7502492451))
        make_face()
        with BuildLine():
            ThreePointArc((16.4309218526, 56.95698385), (17.4336374643, 56.6581105137), (18.4309218526, 56.3415860789))
            Line((18.4309218526, 56.3415860789), (18.4309218526, 59.6731139301))
            ThreePointArc((18.4309218526, 59.6731139301), (17.433345569, 59.972142439), (16.4309218526, 60.2544953802))
            Line((16.4309218526, 60.2544953802), (16.4309218526, 56.95698385))
        make_face()
        with BuildLine():
            ThreePointArc((16.4309218526, 51.4265280587), (17.4342611615, 51.0951026895), (18.4309218526, 50.7441040985))
            Line((18.4309218526, 50.7441040985), (18.4309218526, 54.1097597942))
            ThreePointArc((18.4309218526, 54.1097597942), (17.4338634076, 54.4391898544), (16.4309218526, 54.7502492451))
            Line((16.4309218526, 54.7502492451), (16.4309218526, 51.4265280587))
        make_face()
        with BuildLine():
            ThreePointArc((18.4309218526, -54.1097597942), (17.4338634076, -54.4391898544), (16.4309218526, -54.7502492451))
            Line((16.4309218526, -54.7502492451), (16.4309218526, -56.95698385))
            ThreePointArc((16.4309218526, -56.95698385), (17.4336374643, -56.6581105137), (18.4309218526, -56.3415860789))
            Line((18.4309218526, -56.3415860789), (18.4309218526, -54.1097597942))
        make_face()
        with BuildLine():
            ThreePointArc((18.4309218526, -50.7441040985), (17.4342611615, -51.0951026895), (16.4309218526, -51.4265280587))
            Line((16.4309218526, -51.4265280587), (16.4309218526, -54.7502492451))
            ThreePointArc((16.4309218526, -54.7502492451), (17.4338634076, -54.4391898544), (18.4309218526, -54.1097597942))
            Line((18.4309218526, -54.1097597942), (18.4309218526, -50.7441040985))
        make_face()
        with BuildLine():
            ThreePointArc((18.4309218526, -56.3415860789), (17.4336374643, -56.6581105137), (16.4309218526, -56.95698385))
            Line((16.4309218526, -56.95698385), (16.4309218526, -60.2544953802))
            ThreePointArc((16.4309218526, -60.2544953802), (17.433345569, -59.972142439), (18.4309218526, -59.6731139301))
            Line((18.4309218526, -59.6731139301), (18.4309218526, -56.3415860789))
        make_face()
    extrude(amount=F2_DEPTH)

    # F3: fillet of radius 4 on 4 edges, made by hand

    # F3_s2 → F3_t1 (cut)
    with BuildSketch(Plane.XZ.offset(-14.0105128324)):
        with BuildLine():
            add(Edge.make_bspline(
                [(21.7827406063, 60.6622625134), (16.4309218526, 62.5840055354), (16.4309218526, 56.8976129869)],
                knots=[0, 0, 0, 1, 1, 1], degree=2, weights=[1, 1, 1]))
            Line((16.4309218526, 56.8976129869), (16.4309218526, 62.3251368921))
            ThreePointArc((16.4309218526, 62.3251368921), (19.1249127431, 61.5518935056), (21.7827406063, 60.6622625134))
        make_face()
        with BuildLine():
            add(Edge.make_bspline(
                [(16.4309218526, -56.8976129868), (16.4309218526, -62.5840055353), (21.7827406063, -60.6622625133)],
                knots=[0, 0, 0, 1, 1, 1], degree=2, weights=[1, 1, 1]))
            ThreePointArc((21.7827406063, -60.6622625133), (19.1249127431, -61.5518935056), (16.4309218526, -62.3251368921))
            Line((16.4309218526, -62.3251368921), (16.4309218526, -56.8976129868))
        make_face()
    extrude(amount=F3_T1_DEPTH, mode=Mode.SUBTRACT)

    # F3_s4 → F3_t3 (cut)
    with BuildSketch(Plane.XZ.offset(-7.0097355038)):
        with BuildLine():
            add(Edge.make_bspline(
                [(16.4309218526, -52.1266811571), (16.4309218526, -49.3981976907), (18.9712475675, -48.4025234025)],
                knots=[0, 0, 0, 1, 1, 1], degree=2, weights=[1, 1, 1]))
            ThreePointArc((18.9712475675, -48.4025234025), (17.7070641599, -48.8791610487), (16.4309218526, -49.3227869556))
            Line((16.4309218526, -49.3227869556), (16.4309218526, -52.1266811571))
        make_face()
        with BuildLine():
            add(Edge.make_bspline(
                [(16.4309218526, 52.1266811571), (16.4309218526, 49.3981976907), (18.9712475675, 48.4025234024)],
                knots=[0, 0, 0, 1, 1, 1], degree=2, weights=[1, 1, 1]))
            ThreePointArc((18.9712475675, 48.4025234024), (17.7070641599, 48.8791610487), (16.4309218526, 49.3227869556))
            Line((16.4309218526, 49.3227869556), (16.4309218526, 52.1266811571))
        make_face()
    extrude(amount=F3_T3_DEPTH, mode=Mode.SUBTRACT)


solid = Compound([f1_1.part, f1c_1.part])
